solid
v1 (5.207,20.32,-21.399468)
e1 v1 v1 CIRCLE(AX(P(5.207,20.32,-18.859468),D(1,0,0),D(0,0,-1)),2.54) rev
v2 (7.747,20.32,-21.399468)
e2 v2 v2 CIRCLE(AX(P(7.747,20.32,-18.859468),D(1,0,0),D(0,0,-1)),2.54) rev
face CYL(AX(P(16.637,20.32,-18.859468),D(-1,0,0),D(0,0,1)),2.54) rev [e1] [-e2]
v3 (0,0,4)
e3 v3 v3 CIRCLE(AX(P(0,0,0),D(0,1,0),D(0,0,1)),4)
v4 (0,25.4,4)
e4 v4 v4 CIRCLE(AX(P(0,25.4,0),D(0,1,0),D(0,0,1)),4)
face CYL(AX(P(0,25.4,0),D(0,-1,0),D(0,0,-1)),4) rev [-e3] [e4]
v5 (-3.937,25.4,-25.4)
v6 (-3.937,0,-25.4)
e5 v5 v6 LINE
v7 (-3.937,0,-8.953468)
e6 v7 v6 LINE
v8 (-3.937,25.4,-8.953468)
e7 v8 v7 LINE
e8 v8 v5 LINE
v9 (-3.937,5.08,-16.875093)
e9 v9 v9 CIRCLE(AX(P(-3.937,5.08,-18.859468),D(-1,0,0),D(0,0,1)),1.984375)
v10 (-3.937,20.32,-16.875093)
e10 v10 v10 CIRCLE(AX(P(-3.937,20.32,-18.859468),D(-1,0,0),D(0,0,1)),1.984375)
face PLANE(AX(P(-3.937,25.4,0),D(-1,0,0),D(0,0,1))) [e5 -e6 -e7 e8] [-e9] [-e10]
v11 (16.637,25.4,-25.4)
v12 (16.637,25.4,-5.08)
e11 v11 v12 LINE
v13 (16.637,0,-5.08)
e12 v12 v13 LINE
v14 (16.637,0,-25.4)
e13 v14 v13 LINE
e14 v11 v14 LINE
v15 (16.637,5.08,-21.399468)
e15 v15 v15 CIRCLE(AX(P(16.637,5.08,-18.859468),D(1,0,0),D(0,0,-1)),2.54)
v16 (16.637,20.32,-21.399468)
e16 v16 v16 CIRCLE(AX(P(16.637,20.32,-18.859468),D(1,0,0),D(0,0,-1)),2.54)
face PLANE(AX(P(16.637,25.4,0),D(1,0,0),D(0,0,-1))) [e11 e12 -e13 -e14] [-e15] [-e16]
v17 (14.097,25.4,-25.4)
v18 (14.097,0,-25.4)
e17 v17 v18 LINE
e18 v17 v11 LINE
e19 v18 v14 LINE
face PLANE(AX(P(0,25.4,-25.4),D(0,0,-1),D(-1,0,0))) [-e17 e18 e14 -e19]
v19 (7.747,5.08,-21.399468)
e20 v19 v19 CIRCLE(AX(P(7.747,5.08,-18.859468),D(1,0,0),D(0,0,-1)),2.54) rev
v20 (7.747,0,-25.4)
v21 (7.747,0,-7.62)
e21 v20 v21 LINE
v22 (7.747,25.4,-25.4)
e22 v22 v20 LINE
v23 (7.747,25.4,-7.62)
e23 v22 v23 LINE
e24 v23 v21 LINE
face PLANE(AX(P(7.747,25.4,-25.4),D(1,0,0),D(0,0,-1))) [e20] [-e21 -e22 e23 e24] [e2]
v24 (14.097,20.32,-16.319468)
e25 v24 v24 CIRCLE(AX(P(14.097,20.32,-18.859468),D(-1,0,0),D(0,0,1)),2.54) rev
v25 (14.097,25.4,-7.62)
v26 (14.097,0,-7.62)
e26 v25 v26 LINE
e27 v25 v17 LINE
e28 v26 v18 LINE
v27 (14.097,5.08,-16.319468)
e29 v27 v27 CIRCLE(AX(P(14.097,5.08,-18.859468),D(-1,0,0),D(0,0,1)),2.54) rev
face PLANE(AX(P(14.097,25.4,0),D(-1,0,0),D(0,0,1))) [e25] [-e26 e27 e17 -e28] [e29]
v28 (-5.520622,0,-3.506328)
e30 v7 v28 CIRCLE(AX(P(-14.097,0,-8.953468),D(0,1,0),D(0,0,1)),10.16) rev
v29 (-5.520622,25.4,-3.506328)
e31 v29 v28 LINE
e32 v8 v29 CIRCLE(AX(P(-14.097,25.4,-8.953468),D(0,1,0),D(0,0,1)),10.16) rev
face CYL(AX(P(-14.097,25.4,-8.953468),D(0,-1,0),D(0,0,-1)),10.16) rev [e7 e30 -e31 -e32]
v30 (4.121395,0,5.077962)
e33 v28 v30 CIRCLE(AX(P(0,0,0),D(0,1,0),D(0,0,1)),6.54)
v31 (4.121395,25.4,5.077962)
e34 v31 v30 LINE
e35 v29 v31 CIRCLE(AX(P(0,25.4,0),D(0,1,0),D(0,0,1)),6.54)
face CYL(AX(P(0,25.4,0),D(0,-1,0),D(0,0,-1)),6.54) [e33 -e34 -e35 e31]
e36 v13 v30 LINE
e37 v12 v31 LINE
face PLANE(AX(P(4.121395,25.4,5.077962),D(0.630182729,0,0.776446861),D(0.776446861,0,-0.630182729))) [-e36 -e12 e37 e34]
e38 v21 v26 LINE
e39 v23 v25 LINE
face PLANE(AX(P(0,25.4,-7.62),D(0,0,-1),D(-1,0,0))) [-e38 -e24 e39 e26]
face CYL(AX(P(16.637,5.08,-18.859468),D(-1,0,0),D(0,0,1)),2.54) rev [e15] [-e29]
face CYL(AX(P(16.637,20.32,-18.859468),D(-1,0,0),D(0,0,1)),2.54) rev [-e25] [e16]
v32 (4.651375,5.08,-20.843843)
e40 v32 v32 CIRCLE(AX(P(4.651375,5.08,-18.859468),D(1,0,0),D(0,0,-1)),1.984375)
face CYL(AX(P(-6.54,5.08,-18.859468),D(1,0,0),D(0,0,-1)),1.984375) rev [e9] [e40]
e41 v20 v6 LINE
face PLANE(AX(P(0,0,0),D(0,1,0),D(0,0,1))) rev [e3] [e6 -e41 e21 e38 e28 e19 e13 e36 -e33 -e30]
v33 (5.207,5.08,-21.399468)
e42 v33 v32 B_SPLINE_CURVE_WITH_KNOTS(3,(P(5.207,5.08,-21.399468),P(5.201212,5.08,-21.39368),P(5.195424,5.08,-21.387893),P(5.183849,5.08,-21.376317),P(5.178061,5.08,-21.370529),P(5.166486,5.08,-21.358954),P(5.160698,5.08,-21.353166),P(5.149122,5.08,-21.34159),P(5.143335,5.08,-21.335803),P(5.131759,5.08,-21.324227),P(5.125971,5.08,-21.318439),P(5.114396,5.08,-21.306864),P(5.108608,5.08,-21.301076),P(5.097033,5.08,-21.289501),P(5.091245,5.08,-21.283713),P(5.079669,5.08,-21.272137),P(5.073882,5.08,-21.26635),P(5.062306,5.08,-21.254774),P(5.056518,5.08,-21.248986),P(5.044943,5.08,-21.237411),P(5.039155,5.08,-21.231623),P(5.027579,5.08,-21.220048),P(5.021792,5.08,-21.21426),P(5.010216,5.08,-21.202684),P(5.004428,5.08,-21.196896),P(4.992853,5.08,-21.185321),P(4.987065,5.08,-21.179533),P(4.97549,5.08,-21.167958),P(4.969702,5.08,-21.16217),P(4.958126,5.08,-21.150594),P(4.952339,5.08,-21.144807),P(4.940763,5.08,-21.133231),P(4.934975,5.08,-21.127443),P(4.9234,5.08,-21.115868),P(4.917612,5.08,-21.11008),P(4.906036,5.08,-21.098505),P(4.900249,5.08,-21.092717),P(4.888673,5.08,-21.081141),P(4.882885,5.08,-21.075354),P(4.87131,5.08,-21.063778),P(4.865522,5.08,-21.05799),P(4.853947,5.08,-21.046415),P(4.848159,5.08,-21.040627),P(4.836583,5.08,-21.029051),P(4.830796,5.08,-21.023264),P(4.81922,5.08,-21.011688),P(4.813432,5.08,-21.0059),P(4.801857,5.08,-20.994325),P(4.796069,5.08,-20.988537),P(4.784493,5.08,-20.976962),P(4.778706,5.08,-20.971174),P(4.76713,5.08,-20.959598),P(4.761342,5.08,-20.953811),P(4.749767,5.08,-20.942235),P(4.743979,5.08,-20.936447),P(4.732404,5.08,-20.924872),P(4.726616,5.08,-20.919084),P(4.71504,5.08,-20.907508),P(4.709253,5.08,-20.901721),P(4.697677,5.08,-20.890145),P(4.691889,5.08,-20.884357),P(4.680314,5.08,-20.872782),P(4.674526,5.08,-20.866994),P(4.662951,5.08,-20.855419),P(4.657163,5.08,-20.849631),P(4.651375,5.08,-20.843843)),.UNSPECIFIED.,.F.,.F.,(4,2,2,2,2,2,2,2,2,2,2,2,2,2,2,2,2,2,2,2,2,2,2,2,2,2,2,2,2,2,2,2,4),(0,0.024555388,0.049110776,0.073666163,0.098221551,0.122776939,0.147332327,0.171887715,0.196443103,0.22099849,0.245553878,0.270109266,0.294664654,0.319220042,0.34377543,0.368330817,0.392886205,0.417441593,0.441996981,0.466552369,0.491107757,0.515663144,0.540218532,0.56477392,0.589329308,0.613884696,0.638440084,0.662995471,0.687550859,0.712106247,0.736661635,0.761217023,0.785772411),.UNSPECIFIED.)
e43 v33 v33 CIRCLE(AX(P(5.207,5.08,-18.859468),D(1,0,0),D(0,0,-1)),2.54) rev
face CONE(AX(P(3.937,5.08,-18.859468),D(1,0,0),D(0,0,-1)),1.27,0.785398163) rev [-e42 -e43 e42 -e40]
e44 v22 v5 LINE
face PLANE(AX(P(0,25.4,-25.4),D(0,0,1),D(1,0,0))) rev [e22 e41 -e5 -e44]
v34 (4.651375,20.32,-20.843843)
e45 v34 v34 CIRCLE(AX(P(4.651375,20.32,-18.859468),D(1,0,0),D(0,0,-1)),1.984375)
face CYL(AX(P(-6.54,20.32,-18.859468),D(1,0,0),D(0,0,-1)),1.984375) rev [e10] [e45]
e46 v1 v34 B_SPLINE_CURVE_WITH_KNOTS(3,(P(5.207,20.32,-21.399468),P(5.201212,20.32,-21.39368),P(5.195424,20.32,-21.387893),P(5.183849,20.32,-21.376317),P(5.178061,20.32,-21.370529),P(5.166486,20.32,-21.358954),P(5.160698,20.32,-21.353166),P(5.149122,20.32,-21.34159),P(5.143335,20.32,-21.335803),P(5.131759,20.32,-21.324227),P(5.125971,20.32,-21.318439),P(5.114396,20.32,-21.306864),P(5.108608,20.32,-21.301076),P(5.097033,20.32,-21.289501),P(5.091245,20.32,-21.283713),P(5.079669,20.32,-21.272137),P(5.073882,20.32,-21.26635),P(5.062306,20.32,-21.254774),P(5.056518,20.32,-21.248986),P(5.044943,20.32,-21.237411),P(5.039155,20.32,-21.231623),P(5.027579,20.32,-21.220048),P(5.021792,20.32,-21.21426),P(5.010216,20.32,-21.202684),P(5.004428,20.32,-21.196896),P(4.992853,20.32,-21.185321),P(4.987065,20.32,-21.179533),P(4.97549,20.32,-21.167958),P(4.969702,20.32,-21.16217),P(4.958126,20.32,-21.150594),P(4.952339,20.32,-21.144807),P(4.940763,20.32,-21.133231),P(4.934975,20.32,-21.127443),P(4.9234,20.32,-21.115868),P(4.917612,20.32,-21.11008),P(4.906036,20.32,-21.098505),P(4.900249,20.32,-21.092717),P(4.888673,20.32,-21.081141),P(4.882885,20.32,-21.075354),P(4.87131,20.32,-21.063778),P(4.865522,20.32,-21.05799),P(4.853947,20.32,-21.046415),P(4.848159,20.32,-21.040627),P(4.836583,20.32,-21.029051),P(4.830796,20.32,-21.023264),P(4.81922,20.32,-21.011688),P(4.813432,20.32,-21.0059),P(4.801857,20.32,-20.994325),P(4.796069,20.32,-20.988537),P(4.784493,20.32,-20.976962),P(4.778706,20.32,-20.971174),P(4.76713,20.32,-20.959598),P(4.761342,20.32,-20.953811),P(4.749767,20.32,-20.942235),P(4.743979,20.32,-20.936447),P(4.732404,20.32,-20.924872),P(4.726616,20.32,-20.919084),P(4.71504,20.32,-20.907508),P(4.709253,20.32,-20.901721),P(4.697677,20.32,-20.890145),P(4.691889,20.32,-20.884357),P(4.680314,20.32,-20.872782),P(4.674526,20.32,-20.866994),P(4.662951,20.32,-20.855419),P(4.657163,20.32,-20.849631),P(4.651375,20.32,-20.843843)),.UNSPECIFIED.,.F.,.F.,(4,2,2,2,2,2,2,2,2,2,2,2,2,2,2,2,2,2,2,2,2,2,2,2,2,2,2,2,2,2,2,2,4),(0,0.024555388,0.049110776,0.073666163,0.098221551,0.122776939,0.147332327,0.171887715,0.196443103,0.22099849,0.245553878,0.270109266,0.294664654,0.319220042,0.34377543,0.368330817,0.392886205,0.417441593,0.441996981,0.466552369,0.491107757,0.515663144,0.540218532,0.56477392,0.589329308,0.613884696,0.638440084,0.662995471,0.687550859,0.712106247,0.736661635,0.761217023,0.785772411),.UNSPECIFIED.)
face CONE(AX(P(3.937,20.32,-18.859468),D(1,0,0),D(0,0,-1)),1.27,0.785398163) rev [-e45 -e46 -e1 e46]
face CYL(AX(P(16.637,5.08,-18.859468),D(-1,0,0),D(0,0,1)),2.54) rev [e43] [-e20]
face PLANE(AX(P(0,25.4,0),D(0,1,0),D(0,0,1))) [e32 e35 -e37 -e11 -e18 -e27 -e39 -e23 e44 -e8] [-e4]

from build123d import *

# Parameters (mm, degrees)
SKETCH1_R           = 4
BOSS_EXTRUDE1_DEPTH = 25.4
SKETCH2_R           = 2.54
CUT_EXTRUDE1_DEPTH  = 39.1
SKETCH4_R           = 1.984375
CUT_EXTRUDE3_DEPTH  = 39.1
CHAMFER1_SIZE       = 1.27


with BuildPart() as part:
    # Sketch1 → Boss-Extrude1 (new body)
    with BuildSketch(Plane(origin=(0, 0, 0), x_dir=(1, 0, 0), z_dir=(0, 1, 0))):
        with BuildLine():
            Line((-3.937, 25.4), (-3.937, 8.953468099))
            ThreePointArc((-3.937, 8.953468099), (-4.340935092, 6.117132874), (-5.520621557, 3.506328226))
            ThreePointArc((-5.520621557, 3.506328226), (-4.348789534, -4.884631981), (4.121395045, -5.077962473))
            Line((4.121395045, -5.077962473), (16.637, 5.08))
            Line((16.637, 5.08), (16.637, 25.4))
            Line((16.637, 25.4), (14.097, 25.4))
            Line((14.097, 25.4), (14.097, 7.62))
            Line((14.097, 7.62), (7.747, 7.62))
            Line((7.747, 7.62), (7.747, 25.4))
            Line((7.747, 25.4), (-3.937, 25.4))
        make_face()
        with Locations(Location((0, 0, 0), (0, 0, 270))):
            Circle(SKETCH1_R, mode=Mode.SUBTRACT)
    extrude(amount=BOSS_EXTRUDE1_DEPTH)

    # Sketch2 → Cut-Extrude1 (cut, through all)
    with BuildSketch(Plane(origin=(3.937, 0, 0), x_dir=(0, 0, -1), z_dir=(1, 0, 0))):
        with Locations(Location((18.859468099, 20.32, 0), (0, 0, 180))):
            Circle(SKETCH2_R)
        with Locations(Location((18.859468099, 5.08, 0), (0, 0, 180))):
            Circle(SKETCH2_R)
    extrude(amount=CUT_EXTRUDE1_DEPTH, mode=Mode.SUBTRACT)

    # Sketch4 → Cut-Extrude3 (cut, through all)
    with BuildSketch(Plane(origin=(3.937, 0, 0), x_dir=(0, 0, -1), z_dir=(1, 0, 0))):
        with Locations((18.859468099, 20.32)):
            Circle(SKETCH4_R)
        with Locations((18.859468099, 5.08)):
            Circle(SKETCH4_R)
    extrude(amount=-CUT_EXTRUDE3_DEPTH, mode=Mode.SUBTRACT)

    # Chamfer1
    # the kernel refuses this chamfer: 1.27 mm, written as the material it adds along each edge
    with BuildSketch(Plane(origin=(3.937, 20.32, -18.859468099), x_dir=(0, 0, 1), z_dir=(0, 1, 0))) as chamfer1_piece_1_section:
        Polygon((2.54 - CHAMFER1_SIZE, 0), (2.54, CHAMFER1_SIZE), (2.54, 0), align=None)
    chamfer1_piece_1 = revolve(axis=Axis((3.937, 20.32, -18.859468099), (1, 0, 0)), mode=Mode.PRIVATE)
    chamfer1_piece_1 = chamfer1_piece_1 - Plane(origin=(4.932574819, 20.32, -18.859468099), x_dir=(0, 0, -1), z_dir=(1, 0, 0)) * Cylinder(1.984375, 11, mode=Mode.PRIVATE)
    add(chamfer1_piece_1)
    with BuildSketch(Plane(origin=(3.937, 5.08, -18.859468099), x_dir=(0, 0, 1), z_dir=(0, 1, 0))) as chamfer1_piece_2_section:
        Polygon((2.54 - CHAMFER1_SIZE, 0), (2.54, CHAMFER1_SIZE), (2.54, 0), align=None)
    chamfer1_piece_2 = revolve(axis=Axis((3.937, 5.08, -18.859468099), (1, 0, 0)), mode=Mode.PRIVATE)
    chamfer1_piece_2 = chamfer1_piece_2 - Plane(origin=(4.932574819, 5.08, -18.859468099), x_dir=(0, 0, -1), z_dir=(1, 0, 0)) * Cylinder(1.984375, 11, mode=Mode.PRIVATE)
    add(chamfer1_piece_2)


solid = part.part
